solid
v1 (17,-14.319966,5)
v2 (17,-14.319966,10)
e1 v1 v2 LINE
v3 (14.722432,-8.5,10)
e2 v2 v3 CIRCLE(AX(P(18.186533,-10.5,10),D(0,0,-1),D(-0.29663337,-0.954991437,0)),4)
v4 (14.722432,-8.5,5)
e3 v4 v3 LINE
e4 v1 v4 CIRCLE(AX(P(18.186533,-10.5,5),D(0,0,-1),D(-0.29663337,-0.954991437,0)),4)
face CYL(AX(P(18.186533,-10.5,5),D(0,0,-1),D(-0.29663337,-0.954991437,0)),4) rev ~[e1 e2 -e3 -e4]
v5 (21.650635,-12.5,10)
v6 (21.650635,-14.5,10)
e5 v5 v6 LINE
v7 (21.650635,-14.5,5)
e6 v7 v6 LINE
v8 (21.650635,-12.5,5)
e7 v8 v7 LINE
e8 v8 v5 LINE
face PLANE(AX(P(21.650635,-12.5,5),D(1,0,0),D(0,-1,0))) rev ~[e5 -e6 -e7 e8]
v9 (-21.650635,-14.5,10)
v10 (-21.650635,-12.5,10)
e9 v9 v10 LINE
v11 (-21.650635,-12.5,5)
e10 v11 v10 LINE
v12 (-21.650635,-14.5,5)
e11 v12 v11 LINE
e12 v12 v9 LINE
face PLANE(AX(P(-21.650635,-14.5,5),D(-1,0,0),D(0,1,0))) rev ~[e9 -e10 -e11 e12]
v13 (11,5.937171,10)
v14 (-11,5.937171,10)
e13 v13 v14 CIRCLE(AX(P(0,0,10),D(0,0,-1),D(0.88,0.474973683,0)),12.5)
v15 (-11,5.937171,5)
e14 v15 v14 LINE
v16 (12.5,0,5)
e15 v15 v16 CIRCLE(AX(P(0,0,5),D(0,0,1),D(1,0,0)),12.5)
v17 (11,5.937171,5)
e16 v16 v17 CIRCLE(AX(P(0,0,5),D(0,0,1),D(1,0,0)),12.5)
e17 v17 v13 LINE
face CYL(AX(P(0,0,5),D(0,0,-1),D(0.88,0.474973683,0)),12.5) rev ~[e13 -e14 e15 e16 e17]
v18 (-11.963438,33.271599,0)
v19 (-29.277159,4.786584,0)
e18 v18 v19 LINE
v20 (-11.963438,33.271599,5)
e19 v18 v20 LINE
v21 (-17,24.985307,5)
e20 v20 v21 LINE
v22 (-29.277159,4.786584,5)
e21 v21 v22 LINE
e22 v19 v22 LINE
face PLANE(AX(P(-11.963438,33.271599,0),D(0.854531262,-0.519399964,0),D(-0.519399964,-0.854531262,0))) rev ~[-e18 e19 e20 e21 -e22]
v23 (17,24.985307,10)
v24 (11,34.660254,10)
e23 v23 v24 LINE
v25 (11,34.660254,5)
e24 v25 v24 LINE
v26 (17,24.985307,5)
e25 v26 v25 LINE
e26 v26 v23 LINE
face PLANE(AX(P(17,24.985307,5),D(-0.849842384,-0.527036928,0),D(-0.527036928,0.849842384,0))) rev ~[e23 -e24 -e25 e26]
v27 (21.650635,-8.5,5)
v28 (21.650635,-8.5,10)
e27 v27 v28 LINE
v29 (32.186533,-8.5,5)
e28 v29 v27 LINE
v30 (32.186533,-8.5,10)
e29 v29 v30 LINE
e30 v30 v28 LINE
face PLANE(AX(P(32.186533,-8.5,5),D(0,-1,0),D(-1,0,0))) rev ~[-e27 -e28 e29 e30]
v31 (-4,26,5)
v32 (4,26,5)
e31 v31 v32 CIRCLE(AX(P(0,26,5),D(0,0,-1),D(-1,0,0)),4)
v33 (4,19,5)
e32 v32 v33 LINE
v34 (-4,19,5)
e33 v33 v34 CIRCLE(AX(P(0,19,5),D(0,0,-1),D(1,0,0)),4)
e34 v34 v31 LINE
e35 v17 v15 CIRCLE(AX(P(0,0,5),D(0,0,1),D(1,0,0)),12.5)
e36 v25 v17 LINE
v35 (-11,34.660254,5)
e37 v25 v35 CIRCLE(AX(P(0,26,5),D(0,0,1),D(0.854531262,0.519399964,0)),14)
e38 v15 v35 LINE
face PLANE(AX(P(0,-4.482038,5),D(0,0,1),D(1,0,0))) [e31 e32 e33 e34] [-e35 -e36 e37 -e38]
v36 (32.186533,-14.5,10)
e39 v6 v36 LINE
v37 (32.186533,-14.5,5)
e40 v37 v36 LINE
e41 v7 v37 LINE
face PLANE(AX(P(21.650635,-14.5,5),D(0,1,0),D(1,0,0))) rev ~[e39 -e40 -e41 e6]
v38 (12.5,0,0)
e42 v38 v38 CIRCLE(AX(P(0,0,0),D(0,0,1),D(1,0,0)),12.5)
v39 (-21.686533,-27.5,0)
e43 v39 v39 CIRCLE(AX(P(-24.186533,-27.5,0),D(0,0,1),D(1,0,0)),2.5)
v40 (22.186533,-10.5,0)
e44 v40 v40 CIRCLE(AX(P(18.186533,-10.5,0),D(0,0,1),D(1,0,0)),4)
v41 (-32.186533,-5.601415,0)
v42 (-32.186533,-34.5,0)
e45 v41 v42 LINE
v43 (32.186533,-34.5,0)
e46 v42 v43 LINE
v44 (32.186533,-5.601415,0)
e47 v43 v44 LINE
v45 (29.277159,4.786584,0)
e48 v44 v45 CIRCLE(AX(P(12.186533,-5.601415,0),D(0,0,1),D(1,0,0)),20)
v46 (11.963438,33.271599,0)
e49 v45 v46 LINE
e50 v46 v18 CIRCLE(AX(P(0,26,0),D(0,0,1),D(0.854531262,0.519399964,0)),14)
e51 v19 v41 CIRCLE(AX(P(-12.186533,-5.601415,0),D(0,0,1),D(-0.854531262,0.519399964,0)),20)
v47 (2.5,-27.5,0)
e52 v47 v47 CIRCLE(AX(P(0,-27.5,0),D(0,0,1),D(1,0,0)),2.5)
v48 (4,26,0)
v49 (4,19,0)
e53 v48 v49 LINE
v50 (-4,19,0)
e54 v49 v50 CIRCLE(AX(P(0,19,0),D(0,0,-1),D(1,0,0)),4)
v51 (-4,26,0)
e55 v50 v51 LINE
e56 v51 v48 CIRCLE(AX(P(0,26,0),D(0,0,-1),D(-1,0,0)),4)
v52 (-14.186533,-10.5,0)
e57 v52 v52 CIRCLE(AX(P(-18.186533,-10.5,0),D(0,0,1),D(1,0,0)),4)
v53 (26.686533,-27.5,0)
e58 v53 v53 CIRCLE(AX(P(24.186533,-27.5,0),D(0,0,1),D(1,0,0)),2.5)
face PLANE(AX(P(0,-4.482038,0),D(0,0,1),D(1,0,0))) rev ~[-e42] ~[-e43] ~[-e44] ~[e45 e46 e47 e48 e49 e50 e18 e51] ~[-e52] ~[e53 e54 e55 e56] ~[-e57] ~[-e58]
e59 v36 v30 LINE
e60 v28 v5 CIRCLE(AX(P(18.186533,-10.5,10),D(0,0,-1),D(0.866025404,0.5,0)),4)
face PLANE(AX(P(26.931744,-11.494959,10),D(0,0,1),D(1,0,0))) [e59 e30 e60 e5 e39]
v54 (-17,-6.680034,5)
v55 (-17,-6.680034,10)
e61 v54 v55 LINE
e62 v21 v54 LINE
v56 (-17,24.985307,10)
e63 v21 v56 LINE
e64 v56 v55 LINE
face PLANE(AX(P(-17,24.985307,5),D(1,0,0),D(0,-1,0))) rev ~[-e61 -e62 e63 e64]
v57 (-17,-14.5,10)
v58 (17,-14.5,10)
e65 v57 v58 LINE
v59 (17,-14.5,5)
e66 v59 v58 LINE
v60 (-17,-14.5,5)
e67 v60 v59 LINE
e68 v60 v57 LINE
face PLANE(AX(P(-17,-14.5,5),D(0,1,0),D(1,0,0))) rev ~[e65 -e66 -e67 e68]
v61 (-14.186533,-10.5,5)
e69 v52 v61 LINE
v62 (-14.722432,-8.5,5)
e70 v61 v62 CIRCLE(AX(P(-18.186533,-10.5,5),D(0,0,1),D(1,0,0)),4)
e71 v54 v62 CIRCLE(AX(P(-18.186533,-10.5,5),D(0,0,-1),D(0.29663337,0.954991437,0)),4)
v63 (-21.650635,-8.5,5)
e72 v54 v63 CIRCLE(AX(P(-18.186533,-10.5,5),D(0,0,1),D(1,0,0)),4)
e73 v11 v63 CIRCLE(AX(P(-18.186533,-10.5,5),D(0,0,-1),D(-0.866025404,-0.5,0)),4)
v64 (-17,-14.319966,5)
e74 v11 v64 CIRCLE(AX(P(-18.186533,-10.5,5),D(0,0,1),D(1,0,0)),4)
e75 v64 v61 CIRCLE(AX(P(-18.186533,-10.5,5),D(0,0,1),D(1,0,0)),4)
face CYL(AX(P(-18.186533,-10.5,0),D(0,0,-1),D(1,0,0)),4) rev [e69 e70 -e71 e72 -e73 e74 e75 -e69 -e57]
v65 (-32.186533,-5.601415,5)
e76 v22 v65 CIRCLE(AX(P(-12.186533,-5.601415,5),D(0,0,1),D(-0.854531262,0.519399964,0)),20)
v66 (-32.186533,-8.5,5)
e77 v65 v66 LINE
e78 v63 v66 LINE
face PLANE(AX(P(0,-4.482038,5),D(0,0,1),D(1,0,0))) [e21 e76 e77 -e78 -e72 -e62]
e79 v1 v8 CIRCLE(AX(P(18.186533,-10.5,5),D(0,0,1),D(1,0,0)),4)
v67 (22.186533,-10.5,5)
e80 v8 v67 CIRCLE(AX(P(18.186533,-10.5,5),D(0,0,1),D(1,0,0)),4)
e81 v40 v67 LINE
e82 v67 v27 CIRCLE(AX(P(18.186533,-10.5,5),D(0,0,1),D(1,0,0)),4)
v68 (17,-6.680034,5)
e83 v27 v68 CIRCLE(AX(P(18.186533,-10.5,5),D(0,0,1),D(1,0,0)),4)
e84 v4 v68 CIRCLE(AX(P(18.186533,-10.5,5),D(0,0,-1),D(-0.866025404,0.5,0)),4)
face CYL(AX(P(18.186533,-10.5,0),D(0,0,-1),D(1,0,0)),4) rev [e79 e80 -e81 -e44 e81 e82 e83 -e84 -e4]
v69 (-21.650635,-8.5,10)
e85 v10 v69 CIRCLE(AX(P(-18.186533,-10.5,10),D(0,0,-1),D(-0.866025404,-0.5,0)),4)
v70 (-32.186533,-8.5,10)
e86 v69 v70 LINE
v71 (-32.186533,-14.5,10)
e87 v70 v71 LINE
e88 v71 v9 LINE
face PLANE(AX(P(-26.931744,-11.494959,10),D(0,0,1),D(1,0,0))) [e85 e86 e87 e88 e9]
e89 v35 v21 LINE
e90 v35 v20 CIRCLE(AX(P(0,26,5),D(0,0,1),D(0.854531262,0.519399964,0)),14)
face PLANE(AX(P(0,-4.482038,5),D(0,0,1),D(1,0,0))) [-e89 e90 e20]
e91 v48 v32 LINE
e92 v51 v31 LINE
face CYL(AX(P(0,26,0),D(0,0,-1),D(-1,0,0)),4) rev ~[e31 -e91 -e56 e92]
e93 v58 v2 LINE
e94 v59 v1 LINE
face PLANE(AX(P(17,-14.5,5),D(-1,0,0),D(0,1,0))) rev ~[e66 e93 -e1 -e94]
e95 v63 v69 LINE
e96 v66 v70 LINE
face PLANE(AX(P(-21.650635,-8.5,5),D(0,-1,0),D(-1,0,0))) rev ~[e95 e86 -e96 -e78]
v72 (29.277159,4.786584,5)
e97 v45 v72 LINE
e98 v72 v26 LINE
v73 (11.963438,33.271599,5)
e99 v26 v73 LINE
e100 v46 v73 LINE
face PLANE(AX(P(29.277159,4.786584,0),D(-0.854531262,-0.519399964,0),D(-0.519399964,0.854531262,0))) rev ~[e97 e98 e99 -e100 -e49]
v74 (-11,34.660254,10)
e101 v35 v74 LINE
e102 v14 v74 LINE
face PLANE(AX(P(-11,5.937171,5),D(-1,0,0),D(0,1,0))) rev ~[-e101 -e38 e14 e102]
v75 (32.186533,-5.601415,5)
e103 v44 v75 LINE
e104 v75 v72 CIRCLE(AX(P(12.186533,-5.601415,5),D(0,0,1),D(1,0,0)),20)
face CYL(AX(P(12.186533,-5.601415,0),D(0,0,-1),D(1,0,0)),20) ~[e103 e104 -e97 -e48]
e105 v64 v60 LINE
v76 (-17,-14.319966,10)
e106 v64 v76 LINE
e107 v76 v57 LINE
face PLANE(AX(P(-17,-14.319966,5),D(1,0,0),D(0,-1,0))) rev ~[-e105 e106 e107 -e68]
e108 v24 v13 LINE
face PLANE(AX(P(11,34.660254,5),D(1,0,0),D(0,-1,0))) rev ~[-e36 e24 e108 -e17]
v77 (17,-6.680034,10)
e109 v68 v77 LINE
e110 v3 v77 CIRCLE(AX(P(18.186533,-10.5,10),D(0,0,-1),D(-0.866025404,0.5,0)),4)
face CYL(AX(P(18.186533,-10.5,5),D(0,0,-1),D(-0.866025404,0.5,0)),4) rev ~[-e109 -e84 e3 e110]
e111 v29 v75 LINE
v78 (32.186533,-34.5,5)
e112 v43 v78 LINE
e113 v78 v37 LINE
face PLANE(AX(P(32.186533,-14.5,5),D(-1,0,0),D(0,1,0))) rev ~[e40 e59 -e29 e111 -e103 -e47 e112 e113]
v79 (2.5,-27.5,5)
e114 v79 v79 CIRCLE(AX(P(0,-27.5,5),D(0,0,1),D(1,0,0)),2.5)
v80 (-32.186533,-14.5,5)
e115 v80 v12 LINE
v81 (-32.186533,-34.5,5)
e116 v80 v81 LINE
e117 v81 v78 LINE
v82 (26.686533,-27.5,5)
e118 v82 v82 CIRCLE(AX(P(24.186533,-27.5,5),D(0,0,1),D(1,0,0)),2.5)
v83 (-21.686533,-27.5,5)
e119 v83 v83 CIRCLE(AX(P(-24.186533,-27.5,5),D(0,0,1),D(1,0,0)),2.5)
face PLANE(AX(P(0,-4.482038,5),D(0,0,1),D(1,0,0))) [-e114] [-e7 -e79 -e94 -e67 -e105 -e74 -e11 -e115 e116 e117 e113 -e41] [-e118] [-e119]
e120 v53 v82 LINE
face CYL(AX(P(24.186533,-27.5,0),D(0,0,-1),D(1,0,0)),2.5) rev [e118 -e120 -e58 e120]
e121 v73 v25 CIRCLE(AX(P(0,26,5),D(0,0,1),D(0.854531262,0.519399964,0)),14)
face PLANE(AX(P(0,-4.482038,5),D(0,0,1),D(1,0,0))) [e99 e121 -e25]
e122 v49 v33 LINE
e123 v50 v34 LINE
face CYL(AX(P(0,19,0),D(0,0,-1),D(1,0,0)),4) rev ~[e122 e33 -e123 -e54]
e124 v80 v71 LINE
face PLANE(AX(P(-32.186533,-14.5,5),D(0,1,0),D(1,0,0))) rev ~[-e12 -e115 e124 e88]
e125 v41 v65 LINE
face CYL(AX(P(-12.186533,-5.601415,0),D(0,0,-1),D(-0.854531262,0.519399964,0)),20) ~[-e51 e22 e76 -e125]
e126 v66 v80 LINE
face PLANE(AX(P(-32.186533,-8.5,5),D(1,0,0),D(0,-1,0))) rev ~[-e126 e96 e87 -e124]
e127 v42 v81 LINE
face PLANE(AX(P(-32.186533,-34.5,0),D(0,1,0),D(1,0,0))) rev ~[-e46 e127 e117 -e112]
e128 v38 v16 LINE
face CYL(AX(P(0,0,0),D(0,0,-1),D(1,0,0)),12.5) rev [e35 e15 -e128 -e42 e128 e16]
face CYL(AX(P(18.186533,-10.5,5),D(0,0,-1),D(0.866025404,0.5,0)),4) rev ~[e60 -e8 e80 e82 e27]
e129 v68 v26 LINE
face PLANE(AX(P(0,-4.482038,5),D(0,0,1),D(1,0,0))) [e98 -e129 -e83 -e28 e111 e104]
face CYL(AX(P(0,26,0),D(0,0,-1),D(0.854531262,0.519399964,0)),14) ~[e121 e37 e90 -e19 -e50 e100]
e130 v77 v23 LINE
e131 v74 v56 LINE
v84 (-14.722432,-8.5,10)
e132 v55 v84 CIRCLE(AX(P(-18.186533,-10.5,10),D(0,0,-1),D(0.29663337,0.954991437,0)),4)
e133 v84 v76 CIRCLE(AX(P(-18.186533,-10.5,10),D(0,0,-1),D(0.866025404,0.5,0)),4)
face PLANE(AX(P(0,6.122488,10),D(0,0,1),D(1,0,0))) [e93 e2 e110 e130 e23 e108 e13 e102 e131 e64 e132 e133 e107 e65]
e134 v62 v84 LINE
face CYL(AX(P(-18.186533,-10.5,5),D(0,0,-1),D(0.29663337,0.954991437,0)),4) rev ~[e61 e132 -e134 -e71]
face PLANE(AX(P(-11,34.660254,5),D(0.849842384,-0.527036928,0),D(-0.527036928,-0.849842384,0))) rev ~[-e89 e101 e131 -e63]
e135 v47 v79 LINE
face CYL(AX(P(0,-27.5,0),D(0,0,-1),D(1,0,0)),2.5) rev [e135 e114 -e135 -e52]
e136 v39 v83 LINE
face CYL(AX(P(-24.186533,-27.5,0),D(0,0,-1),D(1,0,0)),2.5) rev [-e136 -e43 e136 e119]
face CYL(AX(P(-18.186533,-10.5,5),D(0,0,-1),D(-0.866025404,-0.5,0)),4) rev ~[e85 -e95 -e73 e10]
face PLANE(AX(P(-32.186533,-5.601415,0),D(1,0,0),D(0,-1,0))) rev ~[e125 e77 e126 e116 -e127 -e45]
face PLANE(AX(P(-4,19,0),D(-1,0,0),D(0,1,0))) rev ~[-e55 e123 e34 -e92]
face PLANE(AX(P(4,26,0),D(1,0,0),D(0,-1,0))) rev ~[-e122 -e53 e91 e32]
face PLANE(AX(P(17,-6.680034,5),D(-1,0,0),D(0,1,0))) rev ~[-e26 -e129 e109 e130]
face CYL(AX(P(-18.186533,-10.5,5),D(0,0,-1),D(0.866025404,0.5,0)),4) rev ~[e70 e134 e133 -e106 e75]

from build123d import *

# Parameters (mm, degrees)
F0_R     = 2.5
F0_R_2   = 4
F0_R_3   = 12.5
F1_DEPTH = 5
F3_DEPTH = 5


# Not quite as in the source:
# - after a boolean that leaves OpenCascade's solid faulty, fix() repairs it


with BuildPart() as f1:
    # F0 (on Top) → F1 (new body)
    with BuildSketch(Plane.XY):
        with BuildLine():
            Line((-32.1865334795, -5.601415029), (-32.1865334795, -34.5))
            Line((-32.1865334795, -34.5), (32.1865334795, -34.5))
            Line((32.1865334795, -34.5), (32.1865334795, -5.601415029))
            ThreePointArc((32.1865334795, -5.601415029), (31.4454600423, -0.2075529944), (29.2771587146, 4.7865842524))
            Line((29.2771587146, 4.7865842524), (11.9634376646, 33.271599497))
            ThreePointArc((11.9634376646, 33.271599497), (0, 40), (-11.9634376646, 33.271599497))
            Line((-11.9634376646, 33.271599497), (-29.2771587146, 4.7865842524))
            ThreePointArc((-29.2771587146, 4.7865842524), (-31.4454600423, -0.2075529944), (-32.1865334795, -5.601415029))
        make_face()
        with Locations((-24.1865334795, -27.5)):
            Circle(F0_R, mode=Mode.SUBTRACT)
        with Locations((-18.1865334795, -10.5)):
            Circle(F0_R_2, mode=Mode.SUBTRACT)
        with Locations((0, -27.5)):
            Circle(F0_R, mode=Mode.SUBTRACT)
        with Locations((24.1865334795, -27.5)):
            Circle(F0_R, mode=Mode.SUBTRACT)
        Circle(F0_R_3, mode=Mode.SUBTRACT)
        with Locations((18.1865334795, -10.5)):
            Circle(F0_R_2, mode=Mode.SUBTRACT)
        with BuildLine():
            Line((-4, 21), (-4, 26))
            ThreePointArc((-4, 26), (0, 30), (4, 26))
            Line((4, 26), (4, 21))
            Line((4, 21), (4, 19))
            ThreePointArc((4, 19), (0, 15), (-4, 19))
            Line((-4, 19), (-4, 21))
        make_face(mode=Mode.SUBTRACT)
    extrude(amount=F1_DEPTH)

    # F2 (on face) → F3 (join)
    with BuildSketch(Plane.XY.offset(5)):
        with BuildLine():
            Line((-32.1865334795, -8.5), (-32.1865334795, -14.5))
            Line((-32.1865334795, -14.5), (-21.6506350946, -14.5))
            Line((-21.6506350946, -14.5), (-21.6506350946, -12.5))
            ThreePointArc((-21.6506350946, -12.5), (-22.1865334795, -10.5), (-21.6506350946, -8.5))
            Line((-21.6506350946, -8.5), (-32.1865334795, -8.5))
        make_face()
        with BuildLine():
            Line((21.6506350946, -14.5), (32.1865334795, -14.5))
            Line((32.1865334795, -14.5), (32.1865334795, -8.5))
            Line((32.1865334795, -8.5), (21.6506350946, -8.5))
            ThreePointArc((21.6506350946, -8.5), (22.1865334795, -10.5), (21.6506350946, -12.5))
            Line((21.6506350946, -12.5), (21.6506350946, -14.5))
        make_face()
        with BuildLine():
            ThreePointArc((17, -14.3199657462), (14.4616036791, -11.9577029816), (14.7224318643, -8.5))
            ThreePointArc((14.7224318643, -8.5), (15.6895011358, -7.3751272866), (17, -6.6800342538))
            Line((17, -6.6800342538), (17, 24.9853071114))
            Line((17, 24.9853071114), (11, 34.6602540378))
            Line((11, 34.6602540378), (11, 5.9371710435))
            ThreePointArc((11, 5.9371710435), (0, -12.5), (-11, 5.9371710435))
            Line((-11, 5.9371710435), (-11, 34.6602540378))
            Line((-11, 34.6602540378), (-17, 24.9853071114))
            Line((-17, 24.9853071114), (-17, -6.6800342538))
            ThreePointArc((-17, -6.6800342538), (-15.6895011358, -7.3751272866), (-14.7224318643, -8.5))
            ThreePointArc((-14.7224318643, -8.5), (-14.4616036791, -11.9577029816), (-17, -14.3199657462))
            Line((-17, -14.3199657462), (-17, -14.5))
            Line((-17, -14.5), (17, -14.5))
            Line((17, -14.5), (17, -14.3199657462))
        make_face()
    extrude(amount=F3_DEPTH)

    add(f1.part.fix(), mode=Mode.REPLACE)


solid = f1.part
